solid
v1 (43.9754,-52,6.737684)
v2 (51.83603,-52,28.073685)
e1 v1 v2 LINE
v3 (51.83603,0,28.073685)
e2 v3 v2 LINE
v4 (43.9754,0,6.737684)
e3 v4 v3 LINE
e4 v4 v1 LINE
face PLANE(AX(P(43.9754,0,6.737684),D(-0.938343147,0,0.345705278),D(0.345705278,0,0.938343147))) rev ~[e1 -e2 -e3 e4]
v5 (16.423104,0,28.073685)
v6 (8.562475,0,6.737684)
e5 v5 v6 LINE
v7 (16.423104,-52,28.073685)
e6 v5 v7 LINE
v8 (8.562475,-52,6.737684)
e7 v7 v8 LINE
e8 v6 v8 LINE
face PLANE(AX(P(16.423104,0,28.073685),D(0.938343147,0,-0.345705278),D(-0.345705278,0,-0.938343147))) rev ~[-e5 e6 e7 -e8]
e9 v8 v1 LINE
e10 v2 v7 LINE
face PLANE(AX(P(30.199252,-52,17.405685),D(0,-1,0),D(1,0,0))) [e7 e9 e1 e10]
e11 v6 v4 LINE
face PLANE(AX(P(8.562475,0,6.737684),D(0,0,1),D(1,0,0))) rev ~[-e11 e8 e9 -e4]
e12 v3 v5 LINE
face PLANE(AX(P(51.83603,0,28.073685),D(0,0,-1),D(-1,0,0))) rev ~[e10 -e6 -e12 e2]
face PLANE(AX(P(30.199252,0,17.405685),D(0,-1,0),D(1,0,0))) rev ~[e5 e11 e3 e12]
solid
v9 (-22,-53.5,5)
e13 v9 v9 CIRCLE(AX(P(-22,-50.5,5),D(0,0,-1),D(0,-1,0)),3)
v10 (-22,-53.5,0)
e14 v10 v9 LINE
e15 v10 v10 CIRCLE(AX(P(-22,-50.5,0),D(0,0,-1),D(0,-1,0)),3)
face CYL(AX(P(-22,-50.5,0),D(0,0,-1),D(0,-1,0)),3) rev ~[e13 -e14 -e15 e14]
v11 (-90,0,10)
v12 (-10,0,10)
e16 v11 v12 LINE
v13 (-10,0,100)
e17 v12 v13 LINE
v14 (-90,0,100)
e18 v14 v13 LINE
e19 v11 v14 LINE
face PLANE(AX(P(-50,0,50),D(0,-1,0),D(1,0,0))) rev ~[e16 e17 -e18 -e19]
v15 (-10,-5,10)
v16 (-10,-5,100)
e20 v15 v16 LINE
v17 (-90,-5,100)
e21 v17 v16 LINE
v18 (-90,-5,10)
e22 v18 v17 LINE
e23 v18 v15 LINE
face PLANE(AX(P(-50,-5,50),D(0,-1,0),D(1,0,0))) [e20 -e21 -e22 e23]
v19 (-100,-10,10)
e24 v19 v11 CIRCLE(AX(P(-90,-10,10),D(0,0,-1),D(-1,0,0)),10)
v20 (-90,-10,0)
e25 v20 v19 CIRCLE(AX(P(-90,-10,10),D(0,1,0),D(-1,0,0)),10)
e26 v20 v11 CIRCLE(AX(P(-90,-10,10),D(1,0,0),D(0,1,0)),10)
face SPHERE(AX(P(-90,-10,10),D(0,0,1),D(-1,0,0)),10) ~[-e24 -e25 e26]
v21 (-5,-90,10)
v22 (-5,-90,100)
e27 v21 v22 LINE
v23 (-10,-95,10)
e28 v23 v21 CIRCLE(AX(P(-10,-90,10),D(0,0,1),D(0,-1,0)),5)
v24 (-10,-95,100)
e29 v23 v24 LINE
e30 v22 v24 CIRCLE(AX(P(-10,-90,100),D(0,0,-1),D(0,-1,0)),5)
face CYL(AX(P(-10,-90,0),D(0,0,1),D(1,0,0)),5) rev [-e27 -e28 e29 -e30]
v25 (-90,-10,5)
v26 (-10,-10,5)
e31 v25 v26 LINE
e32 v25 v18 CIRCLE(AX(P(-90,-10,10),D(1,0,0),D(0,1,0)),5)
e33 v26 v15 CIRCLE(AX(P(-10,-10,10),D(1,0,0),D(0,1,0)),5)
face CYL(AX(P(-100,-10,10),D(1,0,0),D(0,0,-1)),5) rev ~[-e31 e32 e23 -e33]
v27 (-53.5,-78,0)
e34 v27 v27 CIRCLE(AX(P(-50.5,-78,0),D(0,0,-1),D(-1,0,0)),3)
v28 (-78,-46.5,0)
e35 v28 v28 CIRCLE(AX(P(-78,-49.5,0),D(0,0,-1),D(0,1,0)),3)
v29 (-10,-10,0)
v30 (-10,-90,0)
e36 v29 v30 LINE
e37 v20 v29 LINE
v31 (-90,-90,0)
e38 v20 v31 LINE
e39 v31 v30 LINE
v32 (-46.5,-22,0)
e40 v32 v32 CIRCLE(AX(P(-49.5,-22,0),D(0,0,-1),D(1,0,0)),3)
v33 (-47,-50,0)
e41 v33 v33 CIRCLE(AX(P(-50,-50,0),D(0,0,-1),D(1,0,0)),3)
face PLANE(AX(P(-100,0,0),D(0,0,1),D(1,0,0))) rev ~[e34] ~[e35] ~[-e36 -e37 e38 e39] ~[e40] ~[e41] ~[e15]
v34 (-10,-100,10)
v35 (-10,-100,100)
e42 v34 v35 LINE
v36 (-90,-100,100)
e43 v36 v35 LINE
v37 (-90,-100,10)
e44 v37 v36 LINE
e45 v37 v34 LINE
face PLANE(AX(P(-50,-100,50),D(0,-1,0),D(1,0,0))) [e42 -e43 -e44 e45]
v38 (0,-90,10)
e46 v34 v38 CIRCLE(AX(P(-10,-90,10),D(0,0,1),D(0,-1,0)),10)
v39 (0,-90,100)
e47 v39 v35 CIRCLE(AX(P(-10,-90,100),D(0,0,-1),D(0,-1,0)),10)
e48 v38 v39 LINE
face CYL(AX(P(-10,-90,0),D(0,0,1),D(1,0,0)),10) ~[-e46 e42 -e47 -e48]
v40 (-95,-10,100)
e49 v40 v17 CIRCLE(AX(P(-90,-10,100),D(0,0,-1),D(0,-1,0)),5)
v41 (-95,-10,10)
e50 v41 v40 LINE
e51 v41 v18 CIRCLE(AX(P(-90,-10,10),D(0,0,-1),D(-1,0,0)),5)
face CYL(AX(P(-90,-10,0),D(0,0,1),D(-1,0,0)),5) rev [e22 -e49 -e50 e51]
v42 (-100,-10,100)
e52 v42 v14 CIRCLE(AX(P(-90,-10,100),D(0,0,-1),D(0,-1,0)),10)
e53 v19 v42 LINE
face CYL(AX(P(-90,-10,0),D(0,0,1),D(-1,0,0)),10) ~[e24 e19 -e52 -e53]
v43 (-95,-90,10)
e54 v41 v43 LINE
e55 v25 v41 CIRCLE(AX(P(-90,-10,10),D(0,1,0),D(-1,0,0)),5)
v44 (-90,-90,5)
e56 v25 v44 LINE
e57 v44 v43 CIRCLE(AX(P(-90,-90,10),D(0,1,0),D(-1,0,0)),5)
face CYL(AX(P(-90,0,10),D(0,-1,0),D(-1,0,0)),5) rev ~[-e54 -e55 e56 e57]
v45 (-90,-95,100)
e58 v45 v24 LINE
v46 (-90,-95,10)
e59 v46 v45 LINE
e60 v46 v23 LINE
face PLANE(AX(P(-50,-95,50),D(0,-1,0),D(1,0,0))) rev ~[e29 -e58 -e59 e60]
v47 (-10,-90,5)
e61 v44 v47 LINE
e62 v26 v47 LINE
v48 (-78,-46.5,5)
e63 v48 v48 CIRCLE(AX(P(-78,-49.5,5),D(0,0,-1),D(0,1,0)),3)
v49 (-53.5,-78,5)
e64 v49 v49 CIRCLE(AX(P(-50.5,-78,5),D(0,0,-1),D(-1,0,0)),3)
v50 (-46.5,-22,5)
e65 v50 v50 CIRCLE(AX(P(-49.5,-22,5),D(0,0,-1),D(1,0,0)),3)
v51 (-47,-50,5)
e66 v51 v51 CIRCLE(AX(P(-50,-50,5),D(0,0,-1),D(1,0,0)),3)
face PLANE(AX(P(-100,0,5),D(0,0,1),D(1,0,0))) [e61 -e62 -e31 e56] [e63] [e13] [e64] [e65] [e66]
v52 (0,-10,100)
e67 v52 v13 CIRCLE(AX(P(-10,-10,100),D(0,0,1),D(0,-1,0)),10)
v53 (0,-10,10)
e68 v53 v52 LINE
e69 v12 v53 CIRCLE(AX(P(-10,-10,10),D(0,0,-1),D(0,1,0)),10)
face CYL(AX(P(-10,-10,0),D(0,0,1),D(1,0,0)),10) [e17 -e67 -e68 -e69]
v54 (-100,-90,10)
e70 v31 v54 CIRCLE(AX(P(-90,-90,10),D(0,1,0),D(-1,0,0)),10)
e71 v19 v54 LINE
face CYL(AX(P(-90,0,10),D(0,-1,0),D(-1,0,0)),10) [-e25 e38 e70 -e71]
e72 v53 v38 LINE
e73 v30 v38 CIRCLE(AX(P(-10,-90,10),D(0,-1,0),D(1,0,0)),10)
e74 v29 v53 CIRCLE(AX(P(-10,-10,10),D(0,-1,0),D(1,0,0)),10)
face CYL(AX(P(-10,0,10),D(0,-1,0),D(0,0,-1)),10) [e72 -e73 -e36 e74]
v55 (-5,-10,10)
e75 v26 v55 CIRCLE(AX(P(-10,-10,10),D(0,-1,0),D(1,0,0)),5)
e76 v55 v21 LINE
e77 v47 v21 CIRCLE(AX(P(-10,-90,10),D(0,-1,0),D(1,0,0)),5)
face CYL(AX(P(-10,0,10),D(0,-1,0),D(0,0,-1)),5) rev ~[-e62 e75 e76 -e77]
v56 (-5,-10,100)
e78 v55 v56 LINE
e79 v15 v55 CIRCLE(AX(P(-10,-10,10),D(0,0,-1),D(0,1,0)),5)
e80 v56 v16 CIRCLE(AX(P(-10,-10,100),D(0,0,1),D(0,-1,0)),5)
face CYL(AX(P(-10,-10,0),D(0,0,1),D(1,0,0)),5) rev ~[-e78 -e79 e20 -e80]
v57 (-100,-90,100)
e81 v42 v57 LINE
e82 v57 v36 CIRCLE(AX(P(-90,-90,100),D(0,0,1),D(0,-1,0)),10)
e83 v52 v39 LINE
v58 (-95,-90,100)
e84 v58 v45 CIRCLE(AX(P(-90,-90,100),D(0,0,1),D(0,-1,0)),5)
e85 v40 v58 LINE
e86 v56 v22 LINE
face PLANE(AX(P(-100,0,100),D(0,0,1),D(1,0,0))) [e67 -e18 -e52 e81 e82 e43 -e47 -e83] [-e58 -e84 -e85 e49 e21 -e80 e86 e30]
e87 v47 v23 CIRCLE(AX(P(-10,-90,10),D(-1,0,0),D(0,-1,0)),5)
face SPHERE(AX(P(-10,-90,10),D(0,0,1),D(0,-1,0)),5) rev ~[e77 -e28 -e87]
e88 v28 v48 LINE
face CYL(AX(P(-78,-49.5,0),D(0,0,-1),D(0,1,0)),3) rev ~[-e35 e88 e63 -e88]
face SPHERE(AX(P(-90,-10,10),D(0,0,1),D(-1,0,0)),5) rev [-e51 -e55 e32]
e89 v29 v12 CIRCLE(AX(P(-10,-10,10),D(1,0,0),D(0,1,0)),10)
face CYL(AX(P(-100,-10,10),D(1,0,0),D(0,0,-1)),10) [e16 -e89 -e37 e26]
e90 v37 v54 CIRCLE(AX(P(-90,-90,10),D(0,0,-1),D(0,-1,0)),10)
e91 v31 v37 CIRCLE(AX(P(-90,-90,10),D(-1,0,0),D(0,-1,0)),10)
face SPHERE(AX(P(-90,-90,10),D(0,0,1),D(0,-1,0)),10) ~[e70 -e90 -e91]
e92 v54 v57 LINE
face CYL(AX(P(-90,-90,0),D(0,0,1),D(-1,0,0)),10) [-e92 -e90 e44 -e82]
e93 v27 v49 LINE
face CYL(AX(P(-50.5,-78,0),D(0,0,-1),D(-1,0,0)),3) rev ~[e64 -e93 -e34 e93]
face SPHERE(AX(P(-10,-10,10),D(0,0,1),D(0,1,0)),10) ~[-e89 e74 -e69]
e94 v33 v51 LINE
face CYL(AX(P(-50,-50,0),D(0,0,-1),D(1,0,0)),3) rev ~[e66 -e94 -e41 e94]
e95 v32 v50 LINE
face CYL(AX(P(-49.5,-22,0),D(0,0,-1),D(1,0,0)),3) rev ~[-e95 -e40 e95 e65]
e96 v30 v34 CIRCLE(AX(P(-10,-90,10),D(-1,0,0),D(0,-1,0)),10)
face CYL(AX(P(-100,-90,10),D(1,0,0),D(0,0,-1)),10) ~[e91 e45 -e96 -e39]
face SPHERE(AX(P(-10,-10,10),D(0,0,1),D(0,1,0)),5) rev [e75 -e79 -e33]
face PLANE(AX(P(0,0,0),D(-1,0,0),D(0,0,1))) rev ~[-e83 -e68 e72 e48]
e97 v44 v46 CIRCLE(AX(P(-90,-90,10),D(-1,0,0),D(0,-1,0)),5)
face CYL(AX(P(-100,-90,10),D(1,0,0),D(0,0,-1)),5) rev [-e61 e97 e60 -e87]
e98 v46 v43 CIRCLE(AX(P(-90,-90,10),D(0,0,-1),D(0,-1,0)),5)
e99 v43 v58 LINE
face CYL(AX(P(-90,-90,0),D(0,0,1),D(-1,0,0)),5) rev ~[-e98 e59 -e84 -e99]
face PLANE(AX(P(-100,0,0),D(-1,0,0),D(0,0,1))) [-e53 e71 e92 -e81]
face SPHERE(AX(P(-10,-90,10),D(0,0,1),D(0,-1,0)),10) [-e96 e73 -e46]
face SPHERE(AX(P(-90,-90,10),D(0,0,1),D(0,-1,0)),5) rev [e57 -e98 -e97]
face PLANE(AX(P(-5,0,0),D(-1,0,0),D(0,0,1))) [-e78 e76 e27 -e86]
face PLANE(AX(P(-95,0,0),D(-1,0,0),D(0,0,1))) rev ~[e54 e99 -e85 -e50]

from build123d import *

# Parameters (mm, degrees)
F1_DEPTH        = 52
F2_W            = 100
F2_H            = 100
F3_DEPTH        = 100
F4_R            = 10
F5_T            = -5
F6_R            = 3
F7_DEPTH        = 25
F8_R            = 3
F9_DEPTH        = 25
F9_COPIES_COUNT = 4


# Not quite as in the source:
# - a pattern or mirror of a feature is missing from the dataset's text; its kind, count and spacing are read off the source's solid


with BuildPart() as f1:
    # F0 (on Front) → F1 (new body)
    with BuildSketch(Plane.XZ):
        Polygon((16.4231043309, 28.0736852437), (8.5624745116, 6.7376843654), (43.9754001059, 6.7376843654), (51.8360299253, 28.0736852437), align=None)
    extrude(amount=F1_DEPTH)


with BuildPart() as f3:
    # F2 (on Front) → F3 (new body)
    with BuildSketch(Plane.XZ):
        with Locations((-50, 50)):
            Rectangle(F2_W, F2_H)
    extrude(amount=F3_DEPTH)

    # F4
    f4_edges = [f3.edges().sort_by_distance(p)[0] for p in [
        (-100, 0, 50),
        (-100, -100, 50),
        (0, 0, 50),
        (0, -100, 50),
        (-50, -100, 0),
        (-100, -50, 0),
        (-50, 0, 0),
        (0, -50, 0),
    ]]
    fillet(f4_edges, radius=F4_R)

    # F5
    f5_openings = [f3.faces().sort_by_distance(p)[0] for p in [
        (-50, -50, 100),
    ]]
    offset(amount=F5_T, openings=f5_openings)

    # F6 (on face) → F7 (cut)
    with BuildSketch(Plane(origin=(0, 0, 0), x_dir=(1, 0, 0), z_dir=(0, 0, -1))):
        with Locations((-50, 50)):
            Circle(F6_R)
    extrude(amount=-F7_DEPTH, mode=Mode.SUBTRACT)

    # F8 (on face) → F9 (cut)
    with BuildSketch(Plane(origin=(0, 0, 0), x_dir=(1, 0, 0), z_dir=(0, 0, -1))):
        with Locations((-49.5, 22)):
            Circle(F8_R)
    f9 = extrude(amount=-F9_DEPTH, mode=Mode.SUBTRACT)

    # F9_copies: F9 ×4 about axis
    f9_copies_axis = Axis((-50, -50, 0), (0, 0, 1))
    for i in range(1, F9_COPIES_COUNT):
        add(f9.rotate(f9_copies_axis, i * 360 / F9_COPIES_COUNT), mode=Mode.SUBTRACT)


solid = Compound([f1.part, f3.part])
